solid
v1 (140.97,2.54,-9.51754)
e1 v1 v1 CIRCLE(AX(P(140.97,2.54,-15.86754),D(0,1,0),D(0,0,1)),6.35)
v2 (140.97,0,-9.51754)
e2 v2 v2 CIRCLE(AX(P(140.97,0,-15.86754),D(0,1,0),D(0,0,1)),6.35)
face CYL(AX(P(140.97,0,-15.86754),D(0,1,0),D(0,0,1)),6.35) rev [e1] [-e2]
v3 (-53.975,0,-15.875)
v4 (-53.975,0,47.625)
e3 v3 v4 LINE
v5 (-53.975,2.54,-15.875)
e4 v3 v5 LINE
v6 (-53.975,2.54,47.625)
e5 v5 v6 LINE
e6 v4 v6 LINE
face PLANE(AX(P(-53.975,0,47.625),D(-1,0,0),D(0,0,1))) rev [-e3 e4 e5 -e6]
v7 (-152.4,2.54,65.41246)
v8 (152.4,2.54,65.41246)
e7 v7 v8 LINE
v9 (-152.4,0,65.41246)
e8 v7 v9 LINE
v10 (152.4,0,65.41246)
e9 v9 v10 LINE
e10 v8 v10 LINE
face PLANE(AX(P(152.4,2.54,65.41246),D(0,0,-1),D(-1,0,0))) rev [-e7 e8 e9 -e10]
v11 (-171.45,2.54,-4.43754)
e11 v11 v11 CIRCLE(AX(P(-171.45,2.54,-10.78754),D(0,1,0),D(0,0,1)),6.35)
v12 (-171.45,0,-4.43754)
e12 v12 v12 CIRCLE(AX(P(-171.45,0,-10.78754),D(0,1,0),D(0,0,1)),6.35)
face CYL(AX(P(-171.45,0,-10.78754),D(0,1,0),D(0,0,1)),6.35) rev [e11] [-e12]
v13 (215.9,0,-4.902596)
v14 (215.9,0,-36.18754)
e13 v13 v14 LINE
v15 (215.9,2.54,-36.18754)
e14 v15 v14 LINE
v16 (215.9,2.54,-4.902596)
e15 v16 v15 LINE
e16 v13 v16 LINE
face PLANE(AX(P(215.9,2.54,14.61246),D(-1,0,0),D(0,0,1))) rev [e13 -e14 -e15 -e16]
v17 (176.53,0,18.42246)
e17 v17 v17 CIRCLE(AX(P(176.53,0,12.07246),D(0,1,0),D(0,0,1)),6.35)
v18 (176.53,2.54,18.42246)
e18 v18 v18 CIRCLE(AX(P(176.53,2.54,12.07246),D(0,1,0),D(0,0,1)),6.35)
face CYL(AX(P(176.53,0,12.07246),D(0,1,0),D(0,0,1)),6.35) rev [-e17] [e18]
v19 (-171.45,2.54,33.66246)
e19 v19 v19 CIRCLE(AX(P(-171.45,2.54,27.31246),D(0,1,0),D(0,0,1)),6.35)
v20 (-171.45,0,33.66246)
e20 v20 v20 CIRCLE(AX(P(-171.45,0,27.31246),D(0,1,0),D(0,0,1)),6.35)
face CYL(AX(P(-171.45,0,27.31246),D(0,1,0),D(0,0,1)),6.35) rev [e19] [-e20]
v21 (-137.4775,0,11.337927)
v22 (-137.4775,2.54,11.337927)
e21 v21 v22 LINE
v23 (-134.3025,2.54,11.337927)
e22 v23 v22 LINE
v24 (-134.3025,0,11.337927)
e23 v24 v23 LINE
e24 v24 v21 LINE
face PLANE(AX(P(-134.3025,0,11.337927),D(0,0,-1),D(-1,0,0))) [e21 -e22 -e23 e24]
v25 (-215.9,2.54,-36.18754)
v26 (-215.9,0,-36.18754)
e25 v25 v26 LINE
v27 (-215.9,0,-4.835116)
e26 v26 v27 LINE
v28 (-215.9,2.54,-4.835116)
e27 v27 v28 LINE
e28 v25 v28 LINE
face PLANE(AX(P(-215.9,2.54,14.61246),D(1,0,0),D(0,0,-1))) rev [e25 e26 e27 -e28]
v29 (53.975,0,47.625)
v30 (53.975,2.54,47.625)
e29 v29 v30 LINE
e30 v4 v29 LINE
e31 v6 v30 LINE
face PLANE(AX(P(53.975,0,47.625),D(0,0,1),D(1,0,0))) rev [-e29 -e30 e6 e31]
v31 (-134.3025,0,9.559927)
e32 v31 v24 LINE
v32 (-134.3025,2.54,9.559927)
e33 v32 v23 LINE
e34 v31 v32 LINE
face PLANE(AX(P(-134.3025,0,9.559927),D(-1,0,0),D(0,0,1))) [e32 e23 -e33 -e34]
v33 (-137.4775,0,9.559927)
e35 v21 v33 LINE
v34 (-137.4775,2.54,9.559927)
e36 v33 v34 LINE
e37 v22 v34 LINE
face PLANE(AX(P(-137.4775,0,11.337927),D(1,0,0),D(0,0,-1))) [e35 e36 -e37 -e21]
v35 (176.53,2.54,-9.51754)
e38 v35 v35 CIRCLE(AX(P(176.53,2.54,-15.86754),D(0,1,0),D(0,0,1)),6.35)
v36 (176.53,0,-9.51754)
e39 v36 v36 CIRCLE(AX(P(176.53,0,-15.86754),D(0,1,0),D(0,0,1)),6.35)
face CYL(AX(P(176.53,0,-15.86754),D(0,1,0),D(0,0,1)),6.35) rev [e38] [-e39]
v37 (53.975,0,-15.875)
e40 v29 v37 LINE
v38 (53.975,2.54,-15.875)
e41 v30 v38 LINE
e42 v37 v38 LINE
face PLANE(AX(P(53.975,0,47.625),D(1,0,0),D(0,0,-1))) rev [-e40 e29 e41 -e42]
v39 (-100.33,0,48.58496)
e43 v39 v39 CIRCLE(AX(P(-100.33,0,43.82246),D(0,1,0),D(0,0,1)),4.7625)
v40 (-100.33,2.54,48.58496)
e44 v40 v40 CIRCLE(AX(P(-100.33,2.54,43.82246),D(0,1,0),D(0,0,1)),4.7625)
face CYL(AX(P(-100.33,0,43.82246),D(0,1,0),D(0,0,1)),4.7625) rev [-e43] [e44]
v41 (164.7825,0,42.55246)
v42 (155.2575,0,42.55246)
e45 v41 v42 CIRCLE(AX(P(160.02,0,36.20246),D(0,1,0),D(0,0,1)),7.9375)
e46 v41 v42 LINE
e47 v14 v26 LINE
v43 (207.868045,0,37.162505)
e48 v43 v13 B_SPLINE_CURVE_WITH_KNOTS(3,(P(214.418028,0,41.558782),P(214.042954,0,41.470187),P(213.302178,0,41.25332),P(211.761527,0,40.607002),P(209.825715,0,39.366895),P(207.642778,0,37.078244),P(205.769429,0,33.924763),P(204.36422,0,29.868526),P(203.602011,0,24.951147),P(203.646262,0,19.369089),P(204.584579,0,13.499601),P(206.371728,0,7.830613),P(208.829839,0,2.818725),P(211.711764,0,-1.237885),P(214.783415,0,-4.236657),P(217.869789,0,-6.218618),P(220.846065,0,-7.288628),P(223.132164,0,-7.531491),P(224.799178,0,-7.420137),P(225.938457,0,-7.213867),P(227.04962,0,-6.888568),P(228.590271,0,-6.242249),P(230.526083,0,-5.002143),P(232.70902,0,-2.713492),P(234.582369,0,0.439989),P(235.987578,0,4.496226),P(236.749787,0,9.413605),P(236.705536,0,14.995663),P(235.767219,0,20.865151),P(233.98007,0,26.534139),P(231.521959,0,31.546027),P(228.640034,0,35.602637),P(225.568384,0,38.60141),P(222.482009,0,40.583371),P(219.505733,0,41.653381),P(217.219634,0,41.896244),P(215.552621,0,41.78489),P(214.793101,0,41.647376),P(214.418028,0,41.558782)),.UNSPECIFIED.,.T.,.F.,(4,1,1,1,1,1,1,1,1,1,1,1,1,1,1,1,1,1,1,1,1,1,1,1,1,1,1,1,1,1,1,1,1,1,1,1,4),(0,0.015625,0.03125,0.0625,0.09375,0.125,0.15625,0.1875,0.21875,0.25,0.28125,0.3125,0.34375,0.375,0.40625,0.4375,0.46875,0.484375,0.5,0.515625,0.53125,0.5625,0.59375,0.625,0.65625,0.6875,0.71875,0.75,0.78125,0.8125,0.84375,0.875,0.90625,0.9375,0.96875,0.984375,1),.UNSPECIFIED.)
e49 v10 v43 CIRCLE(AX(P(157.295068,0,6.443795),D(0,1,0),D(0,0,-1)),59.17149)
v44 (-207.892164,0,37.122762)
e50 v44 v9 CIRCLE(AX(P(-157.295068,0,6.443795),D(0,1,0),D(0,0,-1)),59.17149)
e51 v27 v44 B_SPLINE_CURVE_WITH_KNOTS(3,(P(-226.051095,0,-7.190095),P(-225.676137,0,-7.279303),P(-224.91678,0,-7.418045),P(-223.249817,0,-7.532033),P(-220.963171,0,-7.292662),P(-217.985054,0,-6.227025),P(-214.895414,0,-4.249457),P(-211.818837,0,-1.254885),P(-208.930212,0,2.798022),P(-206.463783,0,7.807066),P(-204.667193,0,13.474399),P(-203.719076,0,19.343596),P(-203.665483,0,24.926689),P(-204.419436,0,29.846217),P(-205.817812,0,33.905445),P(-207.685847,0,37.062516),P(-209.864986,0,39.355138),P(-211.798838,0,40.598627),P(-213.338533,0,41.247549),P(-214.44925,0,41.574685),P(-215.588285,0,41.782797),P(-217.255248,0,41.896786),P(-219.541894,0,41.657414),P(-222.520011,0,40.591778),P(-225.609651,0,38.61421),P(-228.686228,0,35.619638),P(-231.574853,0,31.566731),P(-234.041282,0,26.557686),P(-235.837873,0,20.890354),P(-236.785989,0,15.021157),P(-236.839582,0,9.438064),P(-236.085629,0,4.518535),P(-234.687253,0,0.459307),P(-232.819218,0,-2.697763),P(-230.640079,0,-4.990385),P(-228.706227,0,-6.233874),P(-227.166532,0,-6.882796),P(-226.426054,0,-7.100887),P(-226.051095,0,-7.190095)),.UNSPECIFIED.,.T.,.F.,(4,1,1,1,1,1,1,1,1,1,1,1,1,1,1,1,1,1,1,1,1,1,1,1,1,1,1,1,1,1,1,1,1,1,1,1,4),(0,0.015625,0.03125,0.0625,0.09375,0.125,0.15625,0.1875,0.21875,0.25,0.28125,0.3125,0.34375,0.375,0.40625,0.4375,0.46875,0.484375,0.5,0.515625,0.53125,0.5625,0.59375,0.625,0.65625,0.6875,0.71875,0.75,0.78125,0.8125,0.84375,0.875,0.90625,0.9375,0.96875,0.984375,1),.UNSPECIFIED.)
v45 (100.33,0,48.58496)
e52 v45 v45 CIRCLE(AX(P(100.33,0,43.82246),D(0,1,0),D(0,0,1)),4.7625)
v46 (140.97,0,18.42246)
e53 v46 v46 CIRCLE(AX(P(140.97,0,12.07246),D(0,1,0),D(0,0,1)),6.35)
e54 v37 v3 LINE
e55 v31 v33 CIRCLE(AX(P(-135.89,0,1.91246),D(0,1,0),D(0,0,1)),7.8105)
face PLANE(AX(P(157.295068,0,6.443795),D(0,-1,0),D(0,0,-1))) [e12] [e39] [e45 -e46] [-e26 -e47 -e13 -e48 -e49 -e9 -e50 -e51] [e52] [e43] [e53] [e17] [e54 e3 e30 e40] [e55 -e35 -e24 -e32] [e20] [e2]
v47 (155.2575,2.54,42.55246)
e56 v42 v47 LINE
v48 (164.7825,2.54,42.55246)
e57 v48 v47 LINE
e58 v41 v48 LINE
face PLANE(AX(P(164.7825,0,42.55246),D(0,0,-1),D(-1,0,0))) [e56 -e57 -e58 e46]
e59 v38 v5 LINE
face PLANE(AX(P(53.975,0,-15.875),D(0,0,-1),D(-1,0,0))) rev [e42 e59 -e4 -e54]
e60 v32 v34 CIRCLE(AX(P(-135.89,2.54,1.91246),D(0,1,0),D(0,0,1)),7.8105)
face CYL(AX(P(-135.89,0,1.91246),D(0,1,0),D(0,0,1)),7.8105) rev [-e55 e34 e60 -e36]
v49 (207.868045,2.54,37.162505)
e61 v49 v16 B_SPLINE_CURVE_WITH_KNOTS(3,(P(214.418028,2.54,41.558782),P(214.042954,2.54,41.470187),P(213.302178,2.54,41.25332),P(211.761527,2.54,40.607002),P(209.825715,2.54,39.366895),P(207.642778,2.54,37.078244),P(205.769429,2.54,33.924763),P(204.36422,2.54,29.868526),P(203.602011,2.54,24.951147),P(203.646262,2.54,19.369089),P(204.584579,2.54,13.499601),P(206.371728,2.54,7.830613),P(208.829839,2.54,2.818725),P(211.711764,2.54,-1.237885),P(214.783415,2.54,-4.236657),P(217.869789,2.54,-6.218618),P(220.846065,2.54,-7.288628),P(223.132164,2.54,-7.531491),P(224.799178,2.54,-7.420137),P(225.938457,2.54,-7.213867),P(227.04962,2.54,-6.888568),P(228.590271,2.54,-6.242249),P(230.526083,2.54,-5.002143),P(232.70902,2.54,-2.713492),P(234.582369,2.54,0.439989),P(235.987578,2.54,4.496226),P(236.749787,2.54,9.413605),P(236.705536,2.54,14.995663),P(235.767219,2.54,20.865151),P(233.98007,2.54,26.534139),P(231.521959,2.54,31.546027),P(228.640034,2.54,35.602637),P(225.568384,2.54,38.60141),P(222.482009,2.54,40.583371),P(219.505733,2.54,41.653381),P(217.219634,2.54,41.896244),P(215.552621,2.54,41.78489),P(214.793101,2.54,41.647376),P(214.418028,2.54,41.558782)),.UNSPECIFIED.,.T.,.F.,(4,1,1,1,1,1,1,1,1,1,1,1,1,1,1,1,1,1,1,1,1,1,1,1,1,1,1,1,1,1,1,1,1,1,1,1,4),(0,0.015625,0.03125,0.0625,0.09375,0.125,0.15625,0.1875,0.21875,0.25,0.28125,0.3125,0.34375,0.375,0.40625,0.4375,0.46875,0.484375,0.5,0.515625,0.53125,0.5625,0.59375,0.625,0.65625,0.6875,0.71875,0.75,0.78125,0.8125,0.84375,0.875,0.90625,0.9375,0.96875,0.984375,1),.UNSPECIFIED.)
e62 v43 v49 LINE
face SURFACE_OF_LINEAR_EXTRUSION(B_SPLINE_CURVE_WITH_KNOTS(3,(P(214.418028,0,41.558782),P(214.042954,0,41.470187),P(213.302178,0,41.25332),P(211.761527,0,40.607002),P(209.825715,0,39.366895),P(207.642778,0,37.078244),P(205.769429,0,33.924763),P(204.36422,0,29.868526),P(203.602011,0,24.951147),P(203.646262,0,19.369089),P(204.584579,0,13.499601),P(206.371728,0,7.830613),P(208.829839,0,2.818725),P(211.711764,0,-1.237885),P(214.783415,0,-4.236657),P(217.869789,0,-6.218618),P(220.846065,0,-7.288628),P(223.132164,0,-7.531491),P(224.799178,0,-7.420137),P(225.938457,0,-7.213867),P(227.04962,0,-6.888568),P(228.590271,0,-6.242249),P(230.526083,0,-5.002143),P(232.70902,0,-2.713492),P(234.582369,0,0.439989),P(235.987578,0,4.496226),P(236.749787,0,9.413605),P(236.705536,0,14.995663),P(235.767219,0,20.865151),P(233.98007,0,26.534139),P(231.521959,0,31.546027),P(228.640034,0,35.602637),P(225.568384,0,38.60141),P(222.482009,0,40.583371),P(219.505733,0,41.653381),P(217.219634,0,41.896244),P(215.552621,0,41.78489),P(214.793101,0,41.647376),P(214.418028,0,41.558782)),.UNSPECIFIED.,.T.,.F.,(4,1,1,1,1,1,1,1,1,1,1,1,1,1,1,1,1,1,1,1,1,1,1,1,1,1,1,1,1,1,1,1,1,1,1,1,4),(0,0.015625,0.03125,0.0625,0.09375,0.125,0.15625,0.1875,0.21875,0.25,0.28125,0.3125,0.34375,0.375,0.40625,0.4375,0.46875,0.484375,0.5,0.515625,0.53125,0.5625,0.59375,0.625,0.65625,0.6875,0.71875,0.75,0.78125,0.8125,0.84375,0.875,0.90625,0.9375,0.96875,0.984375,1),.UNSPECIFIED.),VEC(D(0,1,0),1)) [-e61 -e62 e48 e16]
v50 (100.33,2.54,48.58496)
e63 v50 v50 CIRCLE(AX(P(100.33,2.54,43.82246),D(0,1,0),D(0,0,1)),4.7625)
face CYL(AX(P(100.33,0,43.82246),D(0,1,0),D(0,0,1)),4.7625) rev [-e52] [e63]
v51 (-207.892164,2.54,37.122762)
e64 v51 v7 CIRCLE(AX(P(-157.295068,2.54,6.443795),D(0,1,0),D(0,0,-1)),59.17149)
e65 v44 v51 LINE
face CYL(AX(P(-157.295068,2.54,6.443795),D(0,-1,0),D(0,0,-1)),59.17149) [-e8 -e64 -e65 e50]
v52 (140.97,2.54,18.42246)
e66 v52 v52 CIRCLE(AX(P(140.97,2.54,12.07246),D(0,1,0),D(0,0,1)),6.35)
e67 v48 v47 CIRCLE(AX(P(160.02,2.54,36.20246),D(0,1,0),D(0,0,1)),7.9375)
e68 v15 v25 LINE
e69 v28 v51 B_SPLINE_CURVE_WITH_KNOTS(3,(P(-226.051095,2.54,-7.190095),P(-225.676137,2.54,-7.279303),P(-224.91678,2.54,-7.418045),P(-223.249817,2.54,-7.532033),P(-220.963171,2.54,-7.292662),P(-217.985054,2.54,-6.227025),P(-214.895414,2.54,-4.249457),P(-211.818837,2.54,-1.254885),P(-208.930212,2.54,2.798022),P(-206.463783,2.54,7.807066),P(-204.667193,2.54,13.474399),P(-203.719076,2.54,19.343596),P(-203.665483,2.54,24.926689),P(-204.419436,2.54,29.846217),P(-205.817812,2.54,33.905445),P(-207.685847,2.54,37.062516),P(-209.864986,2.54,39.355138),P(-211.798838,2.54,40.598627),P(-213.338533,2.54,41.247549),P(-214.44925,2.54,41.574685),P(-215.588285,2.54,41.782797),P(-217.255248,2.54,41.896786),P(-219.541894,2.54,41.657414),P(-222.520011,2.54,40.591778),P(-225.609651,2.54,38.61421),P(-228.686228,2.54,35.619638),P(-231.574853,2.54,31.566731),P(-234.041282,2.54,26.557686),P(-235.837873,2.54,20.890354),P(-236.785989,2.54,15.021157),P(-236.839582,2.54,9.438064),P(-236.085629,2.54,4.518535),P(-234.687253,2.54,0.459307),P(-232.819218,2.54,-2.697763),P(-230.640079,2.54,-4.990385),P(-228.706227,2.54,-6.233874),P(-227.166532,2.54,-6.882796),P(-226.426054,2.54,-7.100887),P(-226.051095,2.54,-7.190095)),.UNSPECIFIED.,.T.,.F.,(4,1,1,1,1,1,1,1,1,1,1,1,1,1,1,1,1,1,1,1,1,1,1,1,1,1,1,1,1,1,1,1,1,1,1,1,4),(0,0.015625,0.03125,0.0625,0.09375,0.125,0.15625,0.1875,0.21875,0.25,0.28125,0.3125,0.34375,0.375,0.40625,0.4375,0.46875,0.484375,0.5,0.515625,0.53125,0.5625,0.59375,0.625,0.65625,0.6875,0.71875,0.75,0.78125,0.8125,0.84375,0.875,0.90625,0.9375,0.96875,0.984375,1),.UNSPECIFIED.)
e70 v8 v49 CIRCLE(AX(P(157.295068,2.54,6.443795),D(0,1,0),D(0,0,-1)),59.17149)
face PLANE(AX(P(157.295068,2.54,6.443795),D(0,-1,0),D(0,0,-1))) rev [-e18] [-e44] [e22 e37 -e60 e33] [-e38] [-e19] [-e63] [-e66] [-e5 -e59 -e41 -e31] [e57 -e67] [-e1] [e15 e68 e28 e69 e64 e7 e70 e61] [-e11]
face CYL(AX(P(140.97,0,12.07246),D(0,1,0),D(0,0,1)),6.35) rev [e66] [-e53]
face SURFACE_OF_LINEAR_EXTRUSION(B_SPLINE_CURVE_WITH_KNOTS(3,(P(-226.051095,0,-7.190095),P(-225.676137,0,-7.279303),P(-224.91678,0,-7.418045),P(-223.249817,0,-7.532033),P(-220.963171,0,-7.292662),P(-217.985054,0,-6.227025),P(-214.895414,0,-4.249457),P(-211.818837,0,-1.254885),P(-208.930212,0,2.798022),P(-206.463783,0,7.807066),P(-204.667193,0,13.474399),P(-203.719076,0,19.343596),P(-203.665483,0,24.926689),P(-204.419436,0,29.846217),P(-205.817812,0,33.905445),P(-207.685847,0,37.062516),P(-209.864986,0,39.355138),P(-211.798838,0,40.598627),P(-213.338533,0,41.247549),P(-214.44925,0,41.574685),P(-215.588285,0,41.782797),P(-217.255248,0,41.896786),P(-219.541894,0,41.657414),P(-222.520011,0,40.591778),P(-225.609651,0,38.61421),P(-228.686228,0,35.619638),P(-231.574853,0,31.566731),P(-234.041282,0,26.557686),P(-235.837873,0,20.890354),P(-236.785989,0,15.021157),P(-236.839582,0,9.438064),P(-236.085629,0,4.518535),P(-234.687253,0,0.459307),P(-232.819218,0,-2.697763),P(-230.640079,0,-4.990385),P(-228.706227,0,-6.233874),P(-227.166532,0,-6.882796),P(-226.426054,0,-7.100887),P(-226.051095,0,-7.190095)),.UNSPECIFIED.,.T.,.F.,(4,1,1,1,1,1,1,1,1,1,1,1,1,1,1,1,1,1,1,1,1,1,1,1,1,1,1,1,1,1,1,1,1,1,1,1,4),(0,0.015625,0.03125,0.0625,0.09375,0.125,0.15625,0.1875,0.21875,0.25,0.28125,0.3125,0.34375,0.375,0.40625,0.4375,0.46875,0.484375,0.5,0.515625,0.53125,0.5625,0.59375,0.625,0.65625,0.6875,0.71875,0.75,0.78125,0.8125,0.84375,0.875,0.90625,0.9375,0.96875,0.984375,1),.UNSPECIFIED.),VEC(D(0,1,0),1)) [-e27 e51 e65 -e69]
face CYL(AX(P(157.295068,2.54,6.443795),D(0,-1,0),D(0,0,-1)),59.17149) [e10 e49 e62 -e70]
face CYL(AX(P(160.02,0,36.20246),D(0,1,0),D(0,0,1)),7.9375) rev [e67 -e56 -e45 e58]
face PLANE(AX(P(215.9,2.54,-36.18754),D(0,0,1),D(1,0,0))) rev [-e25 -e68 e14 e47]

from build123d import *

# Parameters (mm, degrees)
BOSS_EXTRUDE1_DEPTH = 2.54
SKETCH2_W           = 107.95
SKETCH2_H           = 63.5
CUT_EXTRUDE1_DEPTH  = 226.664855764
CUT_EXTRUDE2_START  = -2.54
CUT_EXTRUDE2_DEPTH  = 2.54
SKETCH4_R           = 4.7625
SKETCH4_R_2         = 6.35
CUT_EXTRUDE3_DEPTH  = 226.66485589


# Read off the part's stored shape, not the designer's step: Cut-Extrude2
with BuildPart() as part:
    # Sketch1 → Boss-Extrude1 (new body)
    with BuildSketch(Plane(origin=(0, 0, 0), x_dir=(1, 0, 0), z_dir=(0, 1, 0))):
        with BuildLine():
            Line((215.9, -14.612459999), (215.9, 36.187540001))
            Line((215.9, 36.187540001), (-215.9, 36.187540001))
            Line((-215.9, 36.187540001), (-215.9, -14.612459999))
            ThreePointArc((-215.9, -14.612459999), (-194.259204241, -52.648965299), (-152.4, -65.412459999))
            Line((-152.4, -65.412459999), (152.4, -65.412459999))
            ThreePointArc((152.4, -65.412459999), (194.259204241, -52.648965299), (215.9, -14.612459999))
        make_face()
    extrude(amount=BOSS_EXTRUDE1_DEPTH)

    # Sketch2 → Cut-Extrude1 (cut, through all)
    with BuildSketch(Plane(origin=(0, 2.54, 0), x_dir=(1, 0, 0), z_dir=(0, 1, 0))):
        with Locations((0, -15.875)):
            Rectangle(SKETCH2_W, SKETCH2_H)
    extrude(amount=-CUT_EXTRUDE1_DEPTH, mode=Mode.SUBTRACT)

    # Cut-Extrude2 outline → Cut-Extrude2 (cut)
    with BuildSketch(Plane(origin=(0, 2.54, 0), x_dir=(1, 0, 0), z_dir=(0, 1, 0)).offset(CUT_EXTRUDE2_START)):
        with BuildLine():
            add(Edge.make_bspline(
                [(-215.899999994, 4.835115527), (-215.566109371, 4.600913161), (-214.20332449, 3.575815014), (-211.81883724, 1.254885046), (-208.930212321, -2.798021616), (-206.463783195, -7.807066224), (-204.667192604, -13.474398824), (-203.719076257, -19.343595697), (-203.665482888, -24.926688771), (-204.419435916, -29.846217321), (-205.817811739, -33.905445303), (-207.110427717, -36.090029013), (-207.840384867, -37.055481676), (-207.892164085, -37.122761751)],
                knots=[0.114839475, 0.114839475, 0.114839475, 0.114839475, 0.125, 0.15625, 0.1875, 0.21875, 0.25, 0.28125, 0.3125, 0.34375, 0.375, 0.40625, 0.408621758, 0.408621758, 0.408621758, 0.408621758], degree=3))
            Line((-215.899999994, 4.835115527), (-215.9, -14.612459999))
            ThreePointArc((-215.9, -14.612459999), (-213.044051445, -26.27599059), (-207.892164085, -37.122761751))
        make_face()
        with BuildLine():
            add(Edge.make_bspline(
                [(207.868044886, -37.162504966), (207.809793398, -37.087410994), (207.071460176, -36.116522204), (205.76942942, -33.924763186), (204.364219868, -29.86852613), (203.602011314, -24.951147017), (203.646262202, -19.369088999), (204.584578872, -13.499601085), (206.371728131, -7.830613162), (208.829838854, -2.818725142), (211.711764265, 1.237884913), (214.130027538, 3.598772476), (215.528958726, 4.645764848), (215.899999994, 4.902596054)],
                knots=[0.09109108, 0.09109108, 0.09109108, 0.09109108, 0.09375, 0.125, 0.15625, 0.1875, 0.21875, 0.25, 0.28125, 0.3125, 0.34375, 0.375, 0.386307936, 0.386307936, 0.386307936, 0.386307936], degree=3))
            ThreePointArc((207.868044886, -37.162504966), (213.03625635, -26.297889248), (215.9, -14.612459999))
            Line((215.9, -14.612459999), (215.899999994, 4.902596054))
        make_face()
    extrude(amount=CUT_EXTRUDE2_DEPTH, mode=Mode.SUBTRACT)

    # Sketch4 → Cut-Extrude3 (cut, through all)
    with BuildSketch(Plane(origin=(0, 2.54, 0), x_dir=(1, 0, 0), z_dir=(0, 1, 0))):
        with Locations(Location((100.33, -43.822459999, 0), (0, 0, 270))):
            Circle(SKETCH4_R)
        with Locations(Location((140.97, -12.072459999, 0), (0, 0, 270))):
            Circle(SKETCH4_R_2)
        with Locations(Location((140.97, 15.867540001, 0), (0, 0, 270))):
            Circle(SKETCH4_R_2)
        with Locations(Location((176.53, 15.867540001, 0), (0, 0, 270))):
            Circle(SKETCH4_R_2)
        with Locations(Location((-100.33, -43.822459999, 0), (0, 0, 270))):
            Circle(SKETCH4_R)
        with Locations(Location((-171.45, -27.312459999, 0), (0, 0, 270))):
            Circle(SKETCH4_R_2)
        with Locations(Location((-171.45, 10.787540001, 0), (0, 0, 270))):
            Circle(SKETCH4_R_2)
        with Locations(Location((176.53, -12.072459999, 0), (0, 0, 270))):
            Circle(SKETCH4_R_2)
        with BuildLine():
            Line((164.7825, -42.552459999), (155.2575, -42.552459999))
            ThreePointArc((155.2575, -42.552459999), (160.02, -28.264959999), (164.7825, -42.552459999))
        make_face()
        with BuildLine():
            Line((-134.3025, -9.559927161), (-134.3025, -11.337927161))
            Line((-134.3025, -11.337927161), (-137.4775, -11.337927161))
            Line((-137.4775, -11.337927161), (-137.4775, -9.559927161))
            ThreePointArc((-137.4775, -9.559927161), (-135.89, 5.898040001), (-134.3025, -9.559927161))
        make_face()
    extrude(amount=-CUT_EXTRUDE3_DEPTH, mode=Mode.SUBTRACT)


solid = part.part
